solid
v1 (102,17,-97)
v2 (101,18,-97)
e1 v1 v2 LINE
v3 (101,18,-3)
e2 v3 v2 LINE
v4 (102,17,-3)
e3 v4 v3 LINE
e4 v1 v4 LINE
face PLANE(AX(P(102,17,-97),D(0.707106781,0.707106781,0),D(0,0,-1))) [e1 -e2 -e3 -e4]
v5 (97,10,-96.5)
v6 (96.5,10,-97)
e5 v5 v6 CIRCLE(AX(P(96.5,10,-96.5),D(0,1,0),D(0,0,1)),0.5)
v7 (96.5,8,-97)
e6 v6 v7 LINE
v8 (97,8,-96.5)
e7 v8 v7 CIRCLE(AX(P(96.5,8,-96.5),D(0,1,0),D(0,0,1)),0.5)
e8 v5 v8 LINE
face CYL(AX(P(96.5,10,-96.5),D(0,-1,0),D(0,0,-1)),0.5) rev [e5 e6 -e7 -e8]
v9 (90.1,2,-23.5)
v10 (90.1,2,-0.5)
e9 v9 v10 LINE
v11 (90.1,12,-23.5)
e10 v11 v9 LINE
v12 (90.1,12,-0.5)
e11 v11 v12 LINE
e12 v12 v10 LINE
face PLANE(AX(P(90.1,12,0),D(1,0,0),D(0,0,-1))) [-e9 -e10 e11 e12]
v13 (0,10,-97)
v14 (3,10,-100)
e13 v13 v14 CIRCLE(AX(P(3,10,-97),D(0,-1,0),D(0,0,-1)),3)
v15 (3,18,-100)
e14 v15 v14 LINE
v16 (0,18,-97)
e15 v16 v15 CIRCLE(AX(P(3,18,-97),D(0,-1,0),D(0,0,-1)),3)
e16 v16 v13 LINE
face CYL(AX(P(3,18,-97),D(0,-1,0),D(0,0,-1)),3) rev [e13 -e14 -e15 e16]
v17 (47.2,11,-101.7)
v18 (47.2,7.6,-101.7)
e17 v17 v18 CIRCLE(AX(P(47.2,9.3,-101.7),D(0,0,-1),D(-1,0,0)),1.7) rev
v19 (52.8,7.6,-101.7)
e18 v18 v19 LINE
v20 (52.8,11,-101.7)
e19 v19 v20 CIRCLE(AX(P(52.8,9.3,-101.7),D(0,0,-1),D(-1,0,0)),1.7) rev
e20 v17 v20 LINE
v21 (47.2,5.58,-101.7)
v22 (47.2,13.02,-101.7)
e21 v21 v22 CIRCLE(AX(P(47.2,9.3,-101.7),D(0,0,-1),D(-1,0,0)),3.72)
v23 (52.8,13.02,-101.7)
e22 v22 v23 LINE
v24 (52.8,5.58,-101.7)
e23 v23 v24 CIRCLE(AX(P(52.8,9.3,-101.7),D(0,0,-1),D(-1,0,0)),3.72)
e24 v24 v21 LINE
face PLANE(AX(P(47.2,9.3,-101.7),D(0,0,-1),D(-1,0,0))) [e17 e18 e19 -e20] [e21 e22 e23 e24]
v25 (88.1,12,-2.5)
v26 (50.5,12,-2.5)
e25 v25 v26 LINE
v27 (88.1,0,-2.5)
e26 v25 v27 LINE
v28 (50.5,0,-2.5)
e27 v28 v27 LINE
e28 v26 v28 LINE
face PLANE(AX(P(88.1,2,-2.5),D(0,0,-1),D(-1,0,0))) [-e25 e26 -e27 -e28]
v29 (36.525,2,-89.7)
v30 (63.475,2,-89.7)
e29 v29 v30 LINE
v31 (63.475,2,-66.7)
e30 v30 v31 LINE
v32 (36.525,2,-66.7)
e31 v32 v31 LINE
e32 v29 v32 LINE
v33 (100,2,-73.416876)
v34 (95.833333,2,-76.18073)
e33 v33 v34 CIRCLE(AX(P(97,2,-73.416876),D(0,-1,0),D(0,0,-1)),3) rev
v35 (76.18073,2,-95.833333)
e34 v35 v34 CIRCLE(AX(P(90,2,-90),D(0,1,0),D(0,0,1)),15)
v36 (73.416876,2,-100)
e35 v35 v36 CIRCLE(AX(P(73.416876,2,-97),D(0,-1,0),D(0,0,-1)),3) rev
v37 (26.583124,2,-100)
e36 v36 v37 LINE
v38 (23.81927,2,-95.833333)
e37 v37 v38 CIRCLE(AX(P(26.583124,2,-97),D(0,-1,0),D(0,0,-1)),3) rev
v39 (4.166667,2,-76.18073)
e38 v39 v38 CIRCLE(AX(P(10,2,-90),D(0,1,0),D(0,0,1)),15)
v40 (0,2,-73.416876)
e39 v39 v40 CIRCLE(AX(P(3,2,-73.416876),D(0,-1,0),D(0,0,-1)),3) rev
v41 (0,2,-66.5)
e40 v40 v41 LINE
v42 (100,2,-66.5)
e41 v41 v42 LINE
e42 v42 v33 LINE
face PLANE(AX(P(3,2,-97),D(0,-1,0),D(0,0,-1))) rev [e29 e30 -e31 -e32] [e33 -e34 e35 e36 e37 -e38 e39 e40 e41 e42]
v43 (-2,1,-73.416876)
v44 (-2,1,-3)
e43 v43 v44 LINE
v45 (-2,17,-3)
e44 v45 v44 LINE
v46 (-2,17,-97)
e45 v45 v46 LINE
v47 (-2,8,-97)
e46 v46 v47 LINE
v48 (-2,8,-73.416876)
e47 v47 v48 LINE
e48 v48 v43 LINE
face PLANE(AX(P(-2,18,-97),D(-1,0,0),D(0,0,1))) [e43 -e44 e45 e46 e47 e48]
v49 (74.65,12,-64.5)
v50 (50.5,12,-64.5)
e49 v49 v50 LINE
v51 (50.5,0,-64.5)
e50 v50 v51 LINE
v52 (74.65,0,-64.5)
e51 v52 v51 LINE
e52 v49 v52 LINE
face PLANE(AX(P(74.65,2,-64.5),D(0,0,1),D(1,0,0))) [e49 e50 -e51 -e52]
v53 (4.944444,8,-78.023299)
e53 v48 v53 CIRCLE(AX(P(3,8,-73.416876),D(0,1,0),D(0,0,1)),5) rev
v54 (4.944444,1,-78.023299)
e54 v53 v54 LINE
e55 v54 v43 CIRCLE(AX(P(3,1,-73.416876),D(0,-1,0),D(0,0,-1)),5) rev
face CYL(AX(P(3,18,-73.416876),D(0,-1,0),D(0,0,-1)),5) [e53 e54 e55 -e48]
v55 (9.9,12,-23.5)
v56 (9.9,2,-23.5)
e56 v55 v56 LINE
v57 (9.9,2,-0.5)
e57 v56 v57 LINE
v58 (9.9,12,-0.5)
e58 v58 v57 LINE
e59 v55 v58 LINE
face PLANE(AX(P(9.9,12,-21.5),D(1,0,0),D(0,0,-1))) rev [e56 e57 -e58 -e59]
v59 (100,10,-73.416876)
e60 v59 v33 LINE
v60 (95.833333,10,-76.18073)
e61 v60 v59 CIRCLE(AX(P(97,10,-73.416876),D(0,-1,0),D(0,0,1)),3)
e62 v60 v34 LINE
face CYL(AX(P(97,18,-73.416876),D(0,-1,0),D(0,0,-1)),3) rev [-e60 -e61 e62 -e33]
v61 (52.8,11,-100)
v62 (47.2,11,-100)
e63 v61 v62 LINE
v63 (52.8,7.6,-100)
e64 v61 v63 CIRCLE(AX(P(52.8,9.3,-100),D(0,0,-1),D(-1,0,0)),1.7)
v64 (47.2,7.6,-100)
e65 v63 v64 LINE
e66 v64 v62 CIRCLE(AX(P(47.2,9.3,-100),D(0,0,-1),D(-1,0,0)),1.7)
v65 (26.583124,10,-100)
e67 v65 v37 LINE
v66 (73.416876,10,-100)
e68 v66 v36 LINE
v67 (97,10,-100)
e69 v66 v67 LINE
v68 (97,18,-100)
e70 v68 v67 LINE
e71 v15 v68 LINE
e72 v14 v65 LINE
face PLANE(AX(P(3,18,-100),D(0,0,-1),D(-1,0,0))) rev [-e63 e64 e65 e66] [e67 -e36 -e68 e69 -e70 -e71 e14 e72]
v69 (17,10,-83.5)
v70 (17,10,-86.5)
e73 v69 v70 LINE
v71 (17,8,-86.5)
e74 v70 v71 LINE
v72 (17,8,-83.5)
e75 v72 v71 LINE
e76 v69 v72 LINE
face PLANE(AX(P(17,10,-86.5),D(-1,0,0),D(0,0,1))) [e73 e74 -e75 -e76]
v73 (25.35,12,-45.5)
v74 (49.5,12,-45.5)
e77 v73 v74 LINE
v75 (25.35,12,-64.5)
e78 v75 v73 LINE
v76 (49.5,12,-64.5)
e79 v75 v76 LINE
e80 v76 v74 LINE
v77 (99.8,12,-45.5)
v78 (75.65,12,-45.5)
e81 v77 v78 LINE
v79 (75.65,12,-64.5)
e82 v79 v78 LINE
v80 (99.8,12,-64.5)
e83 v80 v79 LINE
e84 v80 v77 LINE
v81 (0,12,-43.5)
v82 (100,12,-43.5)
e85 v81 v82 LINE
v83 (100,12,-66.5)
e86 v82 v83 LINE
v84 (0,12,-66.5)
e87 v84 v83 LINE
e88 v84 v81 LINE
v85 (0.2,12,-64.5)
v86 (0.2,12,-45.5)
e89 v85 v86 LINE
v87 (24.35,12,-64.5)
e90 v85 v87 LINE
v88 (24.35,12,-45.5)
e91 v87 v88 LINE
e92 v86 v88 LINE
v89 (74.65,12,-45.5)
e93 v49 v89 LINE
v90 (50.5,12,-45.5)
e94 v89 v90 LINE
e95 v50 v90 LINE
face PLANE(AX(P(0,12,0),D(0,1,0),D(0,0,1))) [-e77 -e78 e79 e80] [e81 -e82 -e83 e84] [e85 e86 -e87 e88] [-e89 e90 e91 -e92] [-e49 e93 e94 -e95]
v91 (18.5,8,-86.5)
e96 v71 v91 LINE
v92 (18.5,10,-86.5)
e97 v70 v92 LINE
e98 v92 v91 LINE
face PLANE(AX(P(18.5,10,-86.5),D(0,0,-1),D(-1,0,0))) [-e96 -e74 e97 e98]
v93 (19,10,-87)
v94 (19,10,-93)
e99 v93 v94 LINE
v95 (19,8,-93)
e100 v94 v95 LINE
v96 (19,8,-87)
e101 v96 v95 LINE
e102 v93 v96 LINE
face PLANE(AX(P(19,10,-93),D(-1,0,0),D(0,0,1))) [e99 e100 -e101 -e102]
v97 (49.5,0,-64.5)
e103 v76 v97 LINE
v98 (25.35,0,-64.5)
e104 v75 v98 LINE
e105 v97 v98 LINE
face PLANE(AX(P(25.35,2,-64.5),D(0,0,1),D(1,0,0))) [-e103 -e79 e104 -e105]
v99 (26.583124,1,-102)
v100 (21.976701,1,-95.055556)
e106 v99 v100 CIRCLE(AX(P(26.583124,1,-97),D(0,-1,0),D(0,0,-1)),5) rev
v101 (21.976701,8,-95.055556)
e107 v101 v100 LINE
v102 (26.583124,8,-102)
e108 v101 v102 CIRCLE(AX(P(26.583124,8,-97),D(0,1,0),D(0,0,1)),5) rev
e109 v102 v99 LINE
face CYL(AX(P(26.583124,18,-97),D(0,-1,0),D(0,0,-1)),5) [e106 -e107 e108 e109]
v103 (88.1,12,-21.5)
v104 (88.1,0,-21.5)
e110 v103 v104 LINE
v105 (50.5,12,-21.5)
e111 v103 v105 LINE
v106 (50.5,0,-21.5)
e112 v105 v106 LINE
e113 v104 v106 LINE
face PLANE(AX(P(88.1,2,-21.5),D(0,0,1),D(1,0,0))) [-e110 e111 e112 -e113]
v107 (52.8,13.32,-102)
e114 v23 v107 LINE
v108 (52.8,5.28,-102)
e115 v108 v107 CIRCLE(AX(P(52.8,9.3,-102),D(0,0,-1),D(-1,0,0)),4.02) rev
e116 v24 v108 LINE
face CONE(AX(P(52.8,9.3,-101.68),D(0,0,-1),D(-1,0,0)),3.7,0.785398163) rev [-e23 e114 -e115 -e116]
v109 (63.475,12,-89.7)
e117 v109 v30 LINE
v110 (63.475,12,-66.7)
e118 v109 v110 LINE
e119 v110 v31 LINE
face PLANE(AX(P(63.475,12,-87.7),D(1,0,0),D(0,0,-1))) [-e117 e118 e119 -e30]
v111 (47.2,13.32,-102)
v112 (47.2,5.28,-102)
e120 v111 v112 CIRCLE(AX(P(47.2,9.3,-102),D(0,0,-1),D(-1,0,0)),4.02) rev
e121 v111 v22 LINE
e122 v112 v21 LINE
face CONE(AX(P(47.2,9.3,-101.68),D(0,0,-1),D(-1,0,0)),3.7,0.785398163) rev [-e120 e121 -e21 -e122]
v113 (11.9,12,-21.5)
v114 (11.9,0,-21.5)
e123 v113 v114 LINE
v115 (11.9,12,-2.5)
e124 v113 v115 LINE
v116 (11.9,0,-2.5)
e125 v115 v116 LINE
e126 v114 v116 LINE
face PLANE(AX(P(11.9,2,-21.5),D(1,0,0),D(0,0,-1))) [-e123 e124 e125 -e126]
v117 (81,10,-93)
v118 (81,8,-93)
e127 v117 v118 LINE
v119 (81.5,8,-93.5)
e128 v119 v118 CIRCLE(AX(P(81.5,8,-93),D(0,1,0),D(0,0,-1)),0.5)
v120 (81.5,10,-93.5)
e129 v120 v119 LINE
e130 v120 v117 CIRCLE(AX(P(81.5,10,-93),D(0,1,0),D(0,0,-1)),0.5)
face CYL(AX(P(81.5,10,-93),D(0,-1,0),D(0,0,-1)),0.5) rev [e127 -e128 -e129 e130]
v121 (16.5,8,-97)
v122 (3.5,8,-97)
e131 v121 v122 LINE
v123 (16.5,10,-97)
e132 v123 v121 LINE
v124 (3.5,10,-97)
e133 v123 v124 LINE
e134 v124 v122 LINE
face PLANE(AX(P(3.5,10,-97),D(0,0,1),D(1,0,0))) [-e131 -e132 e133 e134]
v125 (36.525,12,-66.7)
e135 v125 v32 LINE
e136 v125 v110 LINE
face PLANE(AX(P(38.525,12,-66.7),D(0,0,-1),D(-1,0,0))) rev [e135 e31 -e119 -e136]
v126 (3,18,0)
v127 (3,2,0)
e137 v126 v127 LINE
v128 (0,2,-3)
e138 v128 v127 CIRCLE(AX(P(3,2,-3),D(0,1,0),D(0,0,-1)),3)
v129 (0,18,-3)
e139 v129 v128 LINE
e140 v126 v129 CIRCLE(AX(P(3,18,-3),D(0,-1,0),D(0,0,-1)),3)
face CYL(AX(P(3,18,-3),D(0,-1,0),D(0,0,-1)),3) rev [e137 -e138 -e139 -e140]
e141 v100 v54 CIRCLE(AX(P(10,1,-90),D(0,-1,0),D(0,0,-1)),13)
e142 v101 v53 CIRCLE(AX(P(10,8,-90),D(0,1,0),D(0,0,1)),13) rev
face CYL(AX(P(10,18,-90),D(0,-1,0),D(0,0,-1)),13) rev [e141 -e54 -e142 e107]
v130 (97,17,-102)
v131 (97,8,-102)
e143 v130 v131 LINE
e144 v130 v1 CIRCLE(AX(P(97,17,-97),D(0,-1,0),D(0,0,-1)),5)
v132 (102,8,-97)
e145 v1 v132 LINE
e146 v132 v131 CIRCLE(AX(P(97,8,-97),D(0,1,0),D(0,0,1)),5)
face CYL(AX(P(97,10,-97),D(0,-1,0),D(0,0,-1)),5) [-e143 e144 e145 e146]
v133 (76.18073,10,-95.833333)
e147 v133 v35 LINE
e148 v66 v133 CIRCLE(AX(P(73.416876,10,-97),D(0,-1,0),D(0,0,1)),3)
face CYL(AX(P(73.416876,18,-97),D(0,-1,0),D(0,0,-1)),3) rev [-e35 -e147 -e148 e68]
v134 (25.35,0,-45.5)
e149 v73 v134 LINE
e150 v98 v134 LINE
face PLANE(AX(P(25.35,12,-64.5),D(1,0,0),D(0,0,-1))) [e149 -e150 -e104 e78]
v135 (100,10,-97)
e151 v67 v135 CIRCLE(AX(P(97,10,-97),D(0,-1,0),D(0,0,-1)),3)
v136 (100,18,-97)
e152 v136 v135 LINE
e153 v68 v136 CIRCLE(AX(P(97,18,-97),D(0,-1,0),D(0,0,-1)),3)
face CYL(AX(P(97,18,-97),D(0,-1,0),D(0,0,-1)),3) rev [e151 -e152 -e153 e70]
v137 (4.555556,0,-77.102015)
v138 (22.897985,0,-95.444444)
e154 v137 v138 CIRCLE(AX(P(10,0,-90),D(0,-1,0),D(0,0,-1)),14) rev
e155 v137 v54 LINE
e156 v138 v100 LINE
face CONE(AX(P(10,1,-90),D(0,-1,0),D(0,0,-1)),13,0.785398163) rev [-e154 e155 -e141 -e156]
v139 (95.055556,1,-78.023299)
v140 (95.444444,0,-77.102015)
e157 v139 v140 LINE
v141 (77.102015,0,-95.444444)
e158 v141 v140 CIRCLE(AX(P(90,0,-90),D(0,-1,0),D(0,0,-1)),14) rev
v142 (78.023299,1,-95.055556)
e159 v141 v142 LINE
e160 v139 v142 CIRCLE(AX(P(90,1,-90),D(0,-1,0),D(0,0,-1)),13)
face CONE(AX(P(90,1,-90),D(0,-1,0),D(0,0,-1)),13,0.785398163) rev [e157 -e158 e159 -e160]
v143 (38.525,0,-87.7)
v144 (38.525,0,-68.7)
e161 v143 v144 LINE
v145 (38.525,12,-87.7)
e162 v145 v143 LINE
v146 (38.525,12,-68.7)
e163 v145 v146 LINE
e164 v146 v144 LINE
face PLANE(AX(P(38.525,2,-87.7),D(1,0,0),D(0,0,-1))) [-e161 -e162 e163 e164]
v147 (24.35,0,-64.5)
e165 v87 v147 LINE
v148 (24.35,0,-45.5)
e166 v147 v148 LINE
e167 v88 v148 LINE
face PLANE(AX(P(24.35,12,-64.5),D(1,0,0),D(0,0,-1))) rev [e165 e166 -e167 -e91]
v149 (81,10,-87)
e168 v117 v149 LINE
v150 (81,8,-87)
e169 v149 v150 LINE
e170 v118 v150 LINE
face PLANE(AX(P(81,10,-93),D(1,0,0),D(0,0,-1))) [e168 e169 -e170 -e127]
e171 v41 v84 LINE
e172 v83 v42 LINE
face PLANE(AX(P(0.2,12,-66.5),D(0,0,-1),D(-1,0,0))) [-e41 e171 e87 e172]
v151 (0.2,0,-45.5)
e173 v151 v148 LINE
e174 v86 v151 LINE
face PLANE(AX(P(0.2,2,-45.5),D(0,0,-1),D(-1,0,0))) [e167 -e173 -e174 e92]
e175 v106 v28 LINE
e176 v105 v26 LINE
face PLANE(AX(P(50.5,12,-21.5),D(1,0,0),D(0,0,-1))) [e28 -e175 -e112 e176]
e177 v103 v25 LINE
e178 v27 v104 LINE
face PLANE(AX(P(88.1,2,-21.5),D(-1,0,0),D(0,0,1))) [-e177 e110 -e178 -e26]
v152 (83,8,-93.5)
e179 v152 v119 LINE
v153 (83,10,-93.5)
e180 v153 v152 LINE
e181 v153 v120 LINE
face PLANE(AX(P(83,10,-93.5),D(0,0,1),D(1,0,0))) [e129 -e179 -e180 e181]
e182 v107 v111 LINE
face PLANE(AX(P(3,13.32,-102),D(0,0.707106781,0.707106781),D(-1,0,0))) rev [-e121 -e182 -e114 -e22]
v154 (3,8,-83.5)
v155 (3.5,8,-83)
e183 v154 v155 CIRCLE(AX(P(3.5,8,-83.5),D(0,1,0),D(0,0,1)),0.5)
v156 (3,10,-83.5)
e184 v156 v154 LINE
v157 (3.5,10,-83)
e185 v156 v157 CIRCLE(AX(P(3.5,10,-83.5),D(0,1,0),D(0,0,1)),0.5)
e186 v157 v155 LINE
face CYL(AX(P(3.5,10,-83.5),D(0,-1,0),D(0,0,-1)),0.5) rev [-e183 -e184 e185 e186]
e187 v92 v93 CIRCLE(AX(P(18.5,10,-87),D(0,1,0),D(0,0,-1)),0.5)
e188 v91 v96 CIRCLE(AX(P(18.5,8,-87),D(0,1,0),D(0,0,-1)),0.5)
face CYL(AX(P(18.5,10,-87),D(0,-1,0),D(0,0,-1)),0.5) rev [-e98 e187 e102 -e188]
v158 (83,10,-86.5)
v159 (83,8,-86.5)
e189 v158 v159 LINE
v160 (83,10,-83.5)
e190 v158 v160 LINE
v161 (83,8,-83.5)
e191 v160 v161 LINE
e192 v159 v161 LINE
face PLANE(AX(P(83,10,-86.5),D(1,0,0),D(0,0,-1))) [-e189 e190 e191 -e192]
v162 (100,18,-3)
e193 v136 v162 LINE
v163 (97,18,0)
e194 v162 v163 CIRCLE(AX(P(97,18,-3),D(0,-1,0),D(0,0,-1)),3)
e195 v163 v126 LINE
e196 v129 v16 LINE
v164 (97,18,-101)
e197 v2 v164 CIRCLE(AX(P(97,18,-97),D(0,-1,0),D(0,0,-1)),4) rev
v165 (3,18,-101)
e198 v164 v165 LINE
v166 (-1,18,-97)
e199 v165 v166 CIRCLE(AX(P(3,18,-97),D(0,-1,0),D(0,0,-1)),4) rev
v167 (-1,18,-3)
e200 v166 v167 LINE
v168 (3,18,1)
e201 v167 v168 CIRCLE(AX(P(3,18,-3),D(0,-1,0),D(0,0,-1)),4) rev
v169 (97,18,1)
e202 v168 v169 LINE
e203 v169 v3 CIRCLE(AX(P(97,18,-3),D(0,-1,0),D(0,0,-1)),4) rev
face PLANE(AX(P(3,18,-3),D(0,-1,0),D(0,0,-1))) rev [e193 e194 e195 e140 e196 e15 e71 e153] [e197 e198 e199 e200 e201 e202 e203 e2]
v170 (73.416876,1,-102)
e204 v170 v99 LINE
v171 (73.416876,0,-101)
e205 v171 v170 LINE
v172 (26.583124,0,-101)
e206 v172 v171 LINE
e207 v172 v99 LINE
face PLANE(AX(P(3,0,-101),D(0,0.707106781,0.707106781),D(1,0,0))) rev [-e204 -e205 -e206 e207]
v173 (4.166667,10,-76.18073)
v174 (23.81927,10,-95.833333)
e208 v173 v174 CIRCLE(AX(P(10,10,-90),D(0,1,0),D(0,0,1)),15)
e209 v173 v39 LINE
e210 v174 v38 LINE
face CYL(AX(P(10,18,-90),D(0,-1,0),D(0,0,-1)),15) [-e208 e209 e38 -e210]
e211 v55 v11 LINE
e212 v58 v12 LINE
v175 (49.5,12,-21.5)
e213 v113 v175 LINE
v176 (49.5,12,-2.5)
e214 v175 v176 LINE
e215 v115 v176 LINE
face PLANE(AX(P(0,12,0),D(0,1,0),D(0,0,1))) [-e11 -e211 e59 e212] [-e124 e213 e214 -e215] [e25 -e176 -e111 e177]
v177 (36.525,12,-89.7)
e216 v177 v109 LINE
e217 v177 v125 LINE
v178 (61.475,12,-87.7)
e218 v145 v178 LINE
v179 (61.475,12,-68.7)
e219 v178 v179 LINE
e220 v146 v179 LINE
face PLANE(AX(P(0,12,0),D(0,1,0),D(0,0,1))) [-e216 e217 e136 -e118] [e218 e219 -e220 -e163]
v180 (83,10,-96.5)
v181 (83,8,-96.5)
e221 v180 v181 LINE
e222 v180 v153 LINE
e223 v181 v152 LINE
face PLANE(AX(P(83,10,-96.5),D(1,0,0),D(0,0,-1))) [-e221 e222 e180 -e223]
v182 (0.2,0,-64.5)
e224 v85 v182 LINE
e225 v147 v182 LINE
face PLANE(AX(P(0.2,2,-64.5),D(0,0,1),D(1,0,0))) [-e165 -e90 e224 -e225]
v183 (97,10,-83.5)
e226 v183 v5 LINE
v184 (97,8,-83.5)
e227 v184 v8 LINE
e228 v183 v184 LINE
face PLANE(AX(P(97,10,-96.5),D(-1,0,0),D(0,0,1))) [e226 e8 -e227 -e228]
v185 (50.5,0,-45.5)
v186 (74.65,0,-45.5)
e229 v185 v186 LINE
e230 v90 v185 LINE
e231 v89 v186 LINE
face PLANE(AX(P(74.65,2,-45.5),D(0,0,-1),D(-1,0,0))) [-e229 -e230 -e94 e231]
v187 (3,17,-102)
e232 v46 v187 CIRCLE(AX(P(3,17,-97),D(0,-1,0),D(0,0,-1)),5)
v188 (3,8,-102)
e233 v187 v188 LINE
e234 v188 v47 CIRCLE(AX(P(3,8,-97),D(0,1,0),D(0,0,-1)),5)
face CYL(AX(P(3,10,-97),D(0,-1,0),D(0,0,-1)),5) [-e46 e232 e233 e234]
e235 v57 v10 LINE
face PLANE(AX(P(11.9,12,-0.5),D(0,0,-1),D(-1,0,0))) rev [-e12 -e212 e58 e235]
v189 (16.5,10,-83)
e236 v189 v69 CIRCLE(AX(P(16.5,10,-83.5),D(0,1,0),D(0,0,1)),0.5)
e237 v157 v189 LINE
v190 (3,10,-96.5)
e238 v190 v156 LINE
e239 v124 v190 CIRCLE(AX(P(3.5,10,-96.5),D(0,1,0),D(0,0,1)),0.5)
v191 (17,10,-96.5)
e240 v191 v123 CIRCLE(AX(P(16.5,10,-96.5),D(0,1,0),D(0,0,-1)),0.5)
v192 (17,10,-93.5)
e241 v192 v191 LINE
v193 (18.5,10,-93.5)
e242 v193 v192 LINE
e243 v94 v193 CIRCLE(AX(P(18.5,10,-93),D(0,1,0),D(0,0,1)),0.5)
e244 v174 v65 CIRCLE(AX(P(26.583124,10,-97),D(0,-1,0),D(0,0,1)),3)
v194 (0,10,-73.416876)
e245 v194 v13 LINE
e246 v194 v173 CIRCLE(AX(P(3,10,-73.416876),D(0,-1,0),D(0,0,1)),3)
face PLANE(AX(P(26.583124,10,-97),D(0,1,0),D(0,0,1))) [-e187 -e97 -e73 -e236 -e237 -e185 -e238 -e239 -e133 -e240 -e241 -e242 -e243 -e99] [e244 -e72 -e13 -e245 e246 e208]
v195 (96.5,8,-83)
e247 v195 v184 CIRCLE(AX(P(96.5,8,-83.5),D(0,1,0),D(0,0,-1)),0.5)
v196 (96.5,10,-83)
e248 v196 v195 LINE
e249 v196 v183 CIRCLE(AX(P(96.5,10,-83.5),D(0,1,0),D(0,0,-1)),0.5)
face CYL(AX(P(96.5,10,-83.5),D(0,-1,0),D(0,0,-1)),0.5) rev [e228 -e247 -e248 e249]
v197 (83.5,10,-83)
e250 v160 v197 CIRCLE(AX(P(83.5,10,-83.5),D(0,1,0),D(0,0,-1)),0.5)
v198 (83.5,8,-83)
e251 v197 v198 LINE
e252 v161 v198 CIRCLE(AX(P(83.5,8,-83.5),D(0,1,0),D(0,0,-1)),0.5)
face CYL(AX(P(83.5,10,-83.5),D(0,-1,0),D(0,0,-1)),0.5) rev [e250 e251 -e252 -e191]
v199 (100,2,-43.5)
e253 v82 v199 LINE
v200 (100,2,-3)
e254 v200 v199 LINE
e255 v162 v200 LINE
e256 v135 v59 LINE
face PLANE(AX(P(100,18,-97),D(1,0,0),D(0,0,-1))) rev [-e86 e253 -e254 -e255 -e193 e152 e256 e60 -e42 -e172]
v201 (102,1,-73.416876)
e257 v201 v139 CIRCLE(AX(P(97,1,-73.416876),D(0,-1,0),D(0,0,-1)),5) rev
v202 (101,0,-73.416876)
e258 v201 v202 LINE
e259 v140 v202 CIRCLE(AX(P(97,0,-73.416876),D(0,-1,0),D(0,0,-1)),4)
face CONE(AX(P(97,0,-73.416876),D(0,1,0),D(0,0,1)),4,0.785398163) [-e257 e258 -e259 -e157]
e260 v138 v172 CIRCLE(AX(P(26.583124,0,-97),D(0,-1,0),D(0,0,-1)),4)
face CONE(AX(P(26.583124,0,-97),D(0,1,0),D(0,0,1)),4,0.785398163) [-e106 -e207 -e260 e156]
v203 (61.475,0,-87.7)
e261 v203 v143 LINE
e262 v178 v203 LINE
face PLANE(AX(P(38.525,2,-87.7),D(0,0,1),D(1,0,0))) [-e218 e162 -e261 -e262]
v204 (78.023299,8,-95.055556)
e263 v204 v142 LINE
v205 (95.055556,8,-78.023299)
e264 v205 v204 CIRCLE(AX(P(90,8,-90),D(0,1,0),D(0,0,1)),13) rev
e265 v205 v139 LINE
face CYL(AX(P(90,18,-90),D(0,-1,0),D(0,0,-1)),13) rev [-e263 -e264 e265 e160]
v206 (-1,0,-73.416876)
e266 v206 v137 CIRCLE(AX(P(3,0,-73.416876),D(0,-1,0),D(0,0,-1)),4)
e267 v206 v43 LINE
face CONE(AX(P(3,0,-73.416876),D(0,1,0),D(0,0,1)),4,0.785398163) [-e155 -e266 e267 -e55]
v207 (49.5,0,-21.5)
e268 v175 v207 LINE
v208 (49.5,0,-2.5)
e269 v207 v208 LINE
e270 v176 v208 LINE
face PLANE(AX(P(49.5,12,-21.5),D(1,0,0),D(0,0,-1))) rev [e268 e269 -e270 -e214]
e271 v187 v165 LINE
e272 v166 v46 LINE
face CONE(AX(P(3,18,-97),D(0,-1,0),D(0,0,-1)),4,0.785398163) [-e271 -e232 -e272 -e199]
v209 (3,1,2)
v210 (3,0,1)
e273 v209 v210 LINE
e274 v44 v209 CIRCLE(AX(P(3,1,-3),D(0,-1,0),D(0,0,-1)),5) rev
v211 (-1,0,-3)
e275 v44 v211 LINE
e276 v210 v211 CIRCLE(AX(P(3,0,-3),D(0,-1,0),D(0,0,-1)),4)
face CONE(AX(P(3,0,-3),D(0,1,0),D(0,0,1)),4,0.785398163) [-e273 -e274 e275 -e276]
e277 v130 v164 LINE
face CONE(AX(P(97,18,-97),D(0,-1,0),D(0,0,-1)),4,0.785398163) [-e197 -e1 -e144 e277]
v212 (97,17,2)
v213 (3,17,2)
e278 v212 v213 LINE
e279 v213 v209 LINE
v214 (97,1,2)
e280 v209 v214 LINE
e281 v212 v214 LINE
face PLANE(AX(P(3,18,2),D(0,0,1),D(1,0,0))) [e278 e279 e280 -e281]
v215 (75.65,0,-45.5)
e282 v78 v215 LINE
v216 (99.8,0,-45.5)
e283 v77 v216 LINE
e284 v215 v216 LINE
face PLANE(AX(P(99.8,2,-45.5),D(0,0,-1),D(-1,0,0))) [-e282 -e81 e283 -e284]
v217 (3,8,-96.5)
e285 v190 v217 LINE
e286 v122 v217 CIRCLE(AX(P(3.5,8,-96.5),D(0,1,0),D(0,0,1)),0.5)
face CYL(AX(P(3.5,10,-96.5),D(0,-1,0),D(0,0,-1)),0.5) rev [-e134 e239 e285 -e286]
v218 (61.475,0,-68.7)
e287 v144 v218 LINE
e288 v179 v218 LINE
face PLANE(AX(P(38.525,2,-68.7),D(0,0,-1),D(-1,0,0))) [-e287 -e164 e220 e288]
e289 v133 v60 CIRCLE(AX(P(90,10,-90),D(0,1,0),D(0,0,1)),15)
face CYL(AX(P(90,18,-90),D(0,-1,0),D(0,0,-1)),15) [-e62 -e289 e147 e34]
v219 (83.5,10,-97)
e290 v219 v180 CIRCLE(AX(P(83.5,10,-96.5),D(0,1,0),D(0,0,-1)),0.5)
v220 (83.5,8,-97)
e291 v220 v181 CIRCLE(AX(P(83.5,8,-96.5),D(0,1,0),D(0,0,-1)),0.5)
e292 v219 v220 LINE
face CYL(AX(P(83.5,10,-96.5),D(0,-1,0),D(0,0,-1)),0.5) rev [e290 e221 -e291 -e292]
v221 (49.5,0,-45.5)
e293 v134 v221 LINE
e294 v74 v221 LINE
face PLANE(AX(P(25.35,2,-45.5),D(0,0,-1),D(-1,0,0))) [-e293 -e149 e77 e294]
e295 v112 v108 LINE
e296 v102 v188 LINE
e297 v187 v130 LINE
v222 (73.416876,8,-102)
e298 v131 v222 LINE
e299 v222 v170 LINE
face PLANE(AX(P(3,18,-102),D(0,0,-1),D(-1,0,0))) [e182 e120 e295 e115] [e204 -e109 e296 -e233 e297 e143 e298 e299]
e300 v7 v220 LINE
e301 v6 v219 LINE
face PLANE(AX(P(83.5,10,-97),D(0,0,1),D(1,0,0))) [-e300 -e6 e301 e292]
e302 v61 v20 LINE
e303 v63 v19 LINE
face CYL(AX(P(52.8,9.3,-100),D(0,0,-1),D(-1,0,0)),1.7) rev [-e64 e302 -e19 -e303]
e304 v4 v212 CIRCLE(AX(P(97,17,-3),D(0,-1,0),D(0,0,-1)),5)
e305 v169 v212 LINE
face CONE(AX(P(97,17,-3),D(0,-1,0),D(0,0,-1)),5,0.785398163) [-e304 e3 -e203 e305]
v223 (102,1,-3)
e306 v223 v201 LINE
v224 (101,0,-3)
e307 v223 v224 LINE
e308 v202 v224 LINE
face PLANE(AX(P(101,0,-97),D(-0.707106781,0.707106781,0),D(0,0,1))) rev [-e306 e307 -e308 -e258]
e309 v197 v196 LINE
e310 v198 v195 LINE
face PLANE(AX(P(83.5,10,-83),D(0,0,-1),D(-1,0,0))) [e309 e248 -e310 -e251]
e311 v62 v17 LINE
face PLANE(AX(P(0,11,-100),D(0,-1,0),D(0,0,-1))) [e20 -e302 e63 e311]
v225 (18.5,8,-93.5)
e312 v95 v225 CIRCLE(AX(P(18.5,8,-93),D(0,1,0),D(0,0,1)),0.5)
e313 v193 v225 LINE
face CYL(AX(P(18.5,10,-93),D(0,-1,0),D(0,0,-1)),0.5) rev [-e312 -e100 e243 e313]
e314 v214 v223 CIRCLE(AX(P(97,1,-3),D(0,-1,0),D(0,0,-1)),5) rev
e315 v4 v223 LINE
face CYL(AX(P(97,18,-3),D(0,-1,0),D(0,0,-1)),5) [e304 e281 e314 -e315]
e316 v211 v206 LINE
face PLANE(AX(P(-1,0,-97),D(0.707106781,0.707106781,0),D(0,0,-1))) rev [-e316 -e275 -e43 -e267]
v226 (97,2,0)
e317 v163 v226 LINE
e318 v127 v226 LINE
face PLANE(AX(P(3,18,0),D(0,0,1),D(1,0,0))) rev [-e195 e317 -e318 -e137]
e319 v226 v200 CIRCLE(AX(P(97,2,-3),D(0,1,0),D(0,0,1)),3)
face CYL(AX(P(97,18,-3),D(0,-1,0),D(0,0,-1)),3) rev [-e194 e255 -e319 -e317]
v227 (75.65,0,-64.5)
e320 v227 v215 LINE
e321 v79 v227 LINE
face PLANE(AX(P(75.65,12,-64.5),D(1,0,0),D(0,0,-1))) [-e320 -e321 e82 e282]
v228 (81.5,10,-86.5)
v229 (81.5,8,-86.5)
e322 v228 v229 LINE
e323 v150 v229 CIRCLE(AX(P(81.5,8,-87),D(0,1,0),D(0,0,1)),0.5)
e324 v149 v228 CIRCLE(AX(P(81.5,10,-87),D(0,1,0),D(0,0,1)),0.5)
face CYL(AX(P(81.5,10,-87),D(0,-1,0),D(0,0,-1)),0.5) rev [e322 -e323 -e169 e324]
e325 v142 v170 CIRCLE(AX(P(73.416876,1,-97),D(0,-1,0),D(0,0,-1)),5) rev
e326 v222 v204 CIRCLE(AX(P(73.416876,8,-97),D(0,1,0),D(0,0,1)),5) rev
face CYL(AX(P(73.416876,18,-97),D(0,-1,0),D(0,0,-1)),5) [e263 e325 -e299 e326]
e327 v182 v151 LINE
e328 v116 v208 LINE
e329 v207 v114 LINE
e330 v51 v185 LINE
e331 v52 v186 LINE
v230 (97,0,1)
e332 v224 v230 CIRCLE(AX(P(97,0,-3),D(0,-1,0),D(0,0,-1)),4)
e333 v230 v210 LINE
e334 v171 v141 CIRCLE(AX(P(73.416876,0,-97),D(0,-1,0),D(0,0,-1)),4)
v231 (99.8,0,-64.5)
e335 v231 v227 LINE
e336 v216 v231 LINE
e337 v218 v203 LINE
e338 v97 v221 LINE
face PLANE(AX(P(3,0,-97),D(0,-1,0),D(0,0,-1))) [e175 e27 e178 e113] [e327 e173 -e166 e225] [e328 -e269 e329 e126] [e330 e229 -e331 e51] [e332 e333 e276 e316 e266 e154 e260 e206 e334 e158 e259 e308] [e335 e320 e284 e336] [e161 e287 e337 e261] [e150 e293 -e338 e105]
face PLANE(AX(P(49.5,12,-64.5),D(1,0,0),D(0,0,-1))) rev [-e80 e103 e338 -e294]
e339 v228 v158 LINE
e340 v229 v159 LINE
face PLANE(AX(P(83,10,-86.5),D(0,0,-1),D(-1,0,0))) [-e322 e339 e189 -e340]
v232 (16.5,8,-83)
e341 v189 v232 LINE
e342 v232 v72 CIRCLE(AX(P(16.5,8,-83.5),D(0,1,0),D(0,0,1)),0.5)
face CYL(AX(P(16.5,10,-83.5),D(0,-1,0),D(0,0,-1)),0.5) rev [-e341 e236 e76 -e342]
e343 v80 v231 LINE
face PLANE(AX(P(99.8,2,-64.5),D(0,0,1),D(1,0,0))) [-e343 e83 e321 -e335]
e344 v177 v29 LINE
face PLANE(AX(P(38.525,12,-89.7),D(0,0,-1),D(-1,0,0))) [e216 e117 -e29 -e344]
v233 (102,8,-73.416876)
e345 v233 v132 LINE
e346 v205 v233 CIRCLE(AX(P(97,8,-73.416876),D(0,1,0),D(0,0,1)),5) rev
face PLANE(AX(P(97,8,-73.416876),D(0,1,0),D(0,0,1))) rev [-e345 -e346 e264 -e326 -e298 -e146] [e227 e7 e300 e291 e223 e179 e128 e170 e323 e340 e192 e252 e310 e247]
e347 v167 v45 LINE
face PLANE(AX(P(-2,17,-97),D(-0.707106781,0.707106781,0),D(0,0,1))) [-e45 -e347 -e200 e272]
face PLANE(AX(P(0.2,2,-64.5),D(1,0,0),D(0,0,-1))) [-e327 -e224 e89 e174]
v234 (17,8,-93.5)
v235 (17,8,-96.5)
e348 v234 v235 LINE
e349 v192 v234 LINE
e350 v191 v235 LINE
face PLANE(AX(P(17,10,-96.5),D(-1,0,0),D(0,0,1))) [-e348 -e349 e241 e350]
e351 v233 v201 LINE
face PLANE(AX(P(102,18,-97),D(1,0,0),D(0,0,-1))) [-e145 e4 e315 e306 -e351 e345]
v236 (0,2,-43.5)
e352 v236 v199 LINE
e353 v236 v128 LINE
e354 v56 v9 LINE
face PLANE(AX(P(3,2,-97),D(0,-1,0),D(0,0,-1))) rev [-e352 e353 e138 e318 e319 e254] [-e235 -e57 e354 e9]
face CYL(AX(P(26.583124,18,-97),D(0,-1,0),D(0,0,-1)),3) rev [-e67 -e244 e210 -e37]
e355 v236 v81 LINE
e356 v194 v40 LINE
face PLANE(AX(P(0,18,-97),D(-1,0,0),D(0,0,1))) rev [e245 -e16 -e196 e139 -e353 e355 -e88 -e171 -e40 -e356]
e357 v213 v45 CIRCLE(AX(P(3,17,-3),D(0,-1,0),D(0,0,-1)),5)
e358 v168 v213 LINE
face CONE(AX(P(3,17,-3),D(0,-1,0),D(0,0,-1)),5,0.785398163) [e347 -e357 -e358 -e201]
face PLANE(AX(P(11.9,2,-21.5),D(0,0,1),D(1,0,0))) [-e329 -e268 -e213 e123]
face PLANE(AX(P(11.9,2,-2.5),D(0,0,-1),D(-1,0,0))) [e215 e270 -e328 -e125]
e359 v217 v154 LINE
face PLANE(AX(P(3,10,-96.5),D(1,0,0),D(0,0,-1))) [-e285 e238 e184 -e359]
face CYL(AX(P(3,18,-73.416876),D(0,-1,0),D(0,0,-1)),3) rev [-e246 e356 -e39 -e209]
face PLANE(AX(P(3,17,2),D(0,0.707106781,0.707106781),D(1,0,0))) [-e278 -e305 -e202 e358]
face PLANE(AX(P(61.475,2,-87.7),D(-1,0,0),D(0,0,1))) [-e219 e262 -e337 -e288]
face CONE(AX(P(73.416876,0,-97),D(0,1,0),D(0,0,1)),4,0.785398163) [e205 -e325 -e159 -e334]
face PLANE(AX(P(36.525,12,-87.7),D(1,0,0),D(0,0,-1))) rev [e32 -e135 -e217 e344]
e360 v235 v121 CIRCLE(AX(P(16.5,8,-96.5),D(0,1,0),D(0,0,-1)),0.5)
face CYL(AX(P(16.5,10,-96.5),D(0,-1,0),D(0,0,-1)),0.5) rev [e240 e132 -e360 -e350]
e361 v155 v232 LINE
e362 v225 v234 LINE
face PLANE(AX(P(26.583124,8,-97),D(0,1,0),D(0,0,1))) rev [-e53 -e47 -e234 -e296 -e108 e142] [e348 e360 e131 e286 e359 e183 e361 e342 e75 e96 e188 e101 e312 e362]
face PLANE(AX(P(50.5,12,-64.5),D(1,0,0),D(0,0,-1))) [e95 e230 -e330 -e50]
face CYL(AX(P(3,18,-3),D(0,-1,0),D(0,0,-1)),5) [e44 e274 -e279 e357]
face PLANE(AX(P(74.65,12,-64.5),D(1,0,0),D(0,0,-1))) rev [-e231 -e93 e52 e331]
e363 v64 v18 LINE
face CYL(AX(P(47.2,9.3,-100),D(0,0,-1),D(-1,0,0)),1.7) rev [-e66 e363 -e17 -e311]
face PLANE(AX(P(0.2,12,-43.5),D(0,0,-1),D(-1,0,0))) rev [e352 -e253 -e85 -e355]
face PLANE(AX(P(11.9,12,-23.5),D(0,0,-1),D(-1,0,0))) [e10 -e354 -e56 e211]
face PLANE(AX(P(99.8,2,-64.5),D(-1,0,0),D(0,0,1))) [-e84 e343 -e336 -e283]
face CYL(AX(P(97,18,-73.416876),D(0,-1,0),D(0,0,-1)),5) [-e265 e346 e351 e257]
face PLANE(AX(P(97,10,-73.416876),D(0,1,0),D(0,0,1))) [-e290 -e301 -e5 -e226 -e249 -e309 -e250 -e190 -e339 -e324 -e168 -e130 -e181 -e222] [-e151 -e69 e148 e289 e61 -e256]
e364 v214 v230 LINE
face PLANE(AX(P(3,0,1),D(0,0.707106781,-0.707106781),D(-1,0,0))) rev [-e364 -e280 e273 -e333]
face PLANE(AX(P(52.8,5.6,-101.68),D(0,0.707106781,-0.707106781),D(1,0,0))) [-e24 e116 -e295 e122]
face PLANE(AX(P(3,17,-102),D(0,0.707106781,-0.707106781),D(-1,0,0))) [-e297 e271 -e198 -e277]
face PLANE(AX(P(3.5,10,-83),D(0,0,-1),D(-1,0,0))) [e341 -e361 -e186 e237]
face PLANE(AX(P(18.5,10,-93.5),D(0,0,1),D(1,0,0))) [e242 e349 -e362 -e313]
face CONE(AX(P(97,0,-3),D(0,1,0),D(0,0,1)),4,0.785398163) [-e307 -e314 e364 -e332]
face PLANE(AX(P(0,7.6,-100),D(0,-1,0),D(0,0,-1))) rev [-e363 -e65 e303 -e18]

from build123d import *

# Parameters (mm, degrees)
SKETCH_1_W            = 22.95
SKETCH_1_H            = 19
SKETCH_1_W_2          = 37.6
SKETCH_1_W_3          = 24.15
EXTRUDE_7_DEPTH       = 2
SKETCH_4_R            = 15
CUT_EXTRUDE_1_DEPTH   = 18
FILLET_1_R            = 3
FILLET_2_R            = 3
SKETCH_1_6_W          = 26.95
SKETCH_1_6_H          = 23
SKETCH_1_6_W_2        = 22.95
SKETCH_1_6_H_2        = 19
EXTRUDE_3_DEPTH       = 12
EXTRUDE_4_OUTLINE_W   = 103.6
EXTRUDE_4_OUTLINE_H   = 23
EXTRUDE_4_OUTLINE_W_2 = 23.15
EXTRUDE_4_OUTLINE_H_2 = 19
EXTRUDE_4_OUTLINE_W_3 = 22.15
EXTRUDE_4_DEPTH       = 12
EXTRUDE_5_OUTLINE_W   = 80.2
EXTRUDE_5_OUTLINE_H   = 23
EXTRUDE_5_OUTLINE_W_2 = 36.6
EXTRUDE_5_OUTLINE_H_2 = 19
EXTRUDE_5_DEPTH       = 12
EXTRUDE_START         = -2
EXTRUDE_7_2_DEPTH     = 18
SKETCH_11_W           = 28.583123952
SKETCH_11_H           = 28.583123952
CUT_EXTRUDE_8_DEPTH   = 10
EXTRUDE_8_DEPTH       = 2
EXTRUDE_9_DEPTH       = 2
EXTRUDE_12_DEPTH      = 8
CHAMFER_1_SIZE        = 1
CHAMFER_2_SIZE        = 1
CUT_EXTRUDE_9_DEPTH   = 2
CUT_EXTRUDE_10_DEPTH  = 0.3
CHAMFER_3_SIZE        = 0.32
SKETCH_1_11_W         = 37.6
SKETCH_1_11_H         = 19
SKETCH_1_11_W_2       = 24.15
CUT_EXTRUDE_12_DEPTH  = 12


# Read off the part's stored shape, not the designer's step: 拉伸-薄壁4, 拉伸-薄壁5
with BuildPart() as part:
    # 草图1 → Extrude 7 (new body)
    with BuildSketch(Plane(origin=(0, 0, 0), x_dir=(1, 0, 0), z_dir=(0, 1, 0))):
        with BuildLine():
            Line((3, 0), (97, 0))
            ThreePointArc((97, 0), (99.121320344, 0.878679656), (100, 3))
            Line((100, 3), (100, 97))
            ThreePointArc((100, 97), (99.121320344, 99.121320344), (97, 100))
            Line((97, 100), (3, 100))
            ThreePointArc((3, 100), (0.878679656, 99.121320344), (0, 97))
            Line((0, 97), (0, 3))
            ThreePointArc((0, 3), (0.878679656, 0.878679656), (3, 0))
        make_face()
        with Locations((50, 78.2)):
            Rectangle(SKETCH_1_W, SKETCH_1_H, mode=Mode.SUBTRACT)
        with Locations((30.7, 12)):
            Rectangle(SKETCH_1_W_2, SKETCH_1_H, mode=Mode.SUBTRACT)
        with Locations((87.725, 55)):
            Rectangle(SKETCH_1_W_3, SKETCH_1_H, mode=Mode.SUBTRACT)
        with Locations((37.425, 55)):
            Rectangle(SKETCH_1_W_3, SKETCH_1_H, mode=Mode.SUBTRACT)
        with Locations((62.575, 55)):
            Rectangle(SKETCH_1_W_3, SKETCH_1_H, mode=Mode.SUBTRACT)
        with Locations((12.275, 55)):
            Rectangle(SKETCH_1_W_3, SKETCH_1_H, mode=Mode.SUBTRACT)
        with Locations((69.3, 12)):
            Rectangle(SKETCH_1_W_2, SKETCH_1_H, mode=Mode.SUBTRACT)
    extrude(amount=EXTRUDE_7_DEPTH)

    # 草图4 → 切除-拉伸1 (cut)
    with BuildSketch(Plane(origin=(0, 2, 0), x_dir=(1, 0, 0), z_dir=(0, 1, 0))):
        with Locations((10, 90)):
            Circle(SKETCH_4_R)
        with Locations((90, 90)):
            Circle(SKETCH_4_R)
    extrude(amount=-CUT_EXTRUDE_1_DEPTH, mode=Mode.SUBTRACT)

    # 圆角1
    fillet_1_edges = [part.edges().sort_by_distance(p)[0] for p in [
        (21.180339887, 1, -100),
        (0, 1, -78.819660113),
    ]]
    fillet(fillet_1_edges, radius=FILLET_1_R)

    # 圆角2
    fillet_2_edges = [part.edges().sort_by_distance(p)[0] for p in [
        (78.819660113, 1, -100),
        (100, 1, -78.819660113),
    ]]
    fillet(fillet_2_edges, radius=FILLET_2_R)

    # 草图1<6> → 拉伸-薄壁3 (add)
    with BuildSketch(Plane(origin=(0, 0, 0), x_dir=(1, 0, 0), z_dir=(0, 1, 0))):
        with Locations((50, 78.2)):
            Rectangle(SKETCH_1_6_W, SKETCH_1_6_H)
        with Locations((50, 78.2)):
            Rectangle(SKETCH_1_6_W_2, SKETCH_1_6_H_2, mode=Mode.SUBTRACT)
    extrude(amount=EXTRUDE_3_DEPTH)

    # 拉伸-薄壁4 outline → 拉伸-薄壁4 (add)
    with BuildSketch(Plane(origin=(0, 0, 0), x_dir=(1, 0, 0), z_dir=(0, 1, 0))):
        with Locations((50, 55)):
            Rectangle(EXTRUDE_4_OUTLINE_W, EXTRUDE_4_OUTLINE_H)
        with Locations((11.775, 55)):
            Rectangle(EXTRUDE_4_OUTLINE_W_2, EXTRUDE_4_OUTLINE_H_2, mode=Mode.SUBTRACT)
        with Locations((37.425, 55)):
            Rectangle(EXTRUDE_4_OUTLINE_W_3, EXTRUDE_4_OUTLINE_H_2, mode=Mode.SUBTRACT)
        with Locations((62.575, 55)):
            Rectangle(EXTRUDE_4_OUTLINE_W_3, EXTRUDE_4_OUTLINE_H_2, mode=Mode.SUBTRACT)
        with Locations((88.225, 55)):
            Rectangle(EXTRUDE_4_OUTLINE_W_2, EXTRUDE_4_OUTLINE_H_2, mode=Mode.SUBTRACT)
    extrude(amount=EXTRUDE_4_DEPTH)

    # 拉伸-薄壁5 outline → 拉伸-薄壁5 (add)
    with BuildSketch(Plane(origin=(0, 0, 0), x_dir=(1, 0, 0), z_dir=(0, 1, 0))):
        with Locations((50, 12)):
            Rectangle(EXTRUDE_5_OUTLINE_W, EXTRUDE_5_OUTLINE_H)
        with Locations((30.2, 12)):
            Rectangle(EXTRUDE_5_OUTLINE_W_2, EXTRUDE_5_OUTLINE_H_2, mode=Mode.SUBTRACT)
        with Locations((69.8, 12)):
            Rectangle(EXTRUDE_5_OUTLINE_W_2, EXTRUDE_5_OUTLINE_H_2, mode=Mode.SUBTRACT)
    extrude(amount=EXTRUDE_5_DEPTH)

    # 草图10 → Extrude 7 2 (add)
    with BuildSketch(Plane(origin=(0, 2, 0), x_dir=(1, 0, 0), z_dir=(0, 1, 0)).offset(EXTRUDE_START)):
        with BuildLine():
            Line((-2, 3), (-2, 73.416876048))
            ThreePointArc((-2, 73.416876048), (0.236146008, 77.583542715), (4.944444444, 78.023299368))
            ThreePointArc((4.944444444, 78.023299368), (19.192388155, 80.807611845), (21.976700632, 95.055555556))
            ThreePointArc((21.976700632, 95.055555556), (22.416457285, 99.763853992), (26.583123952, 102))
            Line((26.583123952, 102), (73.416876048, 102))
            ThreePointArc((73.416876048, 102), (77.583542715, 99.763853992), (78.023299368, 95.055555556))
            ThreePointArc((78.023299368, 95.055555556), (80.807611845, 80.807611845), (95.055555556, 78.023299368))
            ThreePointArc((95.055555556, 78.023299368), (99.763853992, 77.583542715), (102, 73.416876048))
            Line((102, 73.416876048), (102, 3))
            ThreePointArc((102, 3), (100.535533906, -0.535533906), (97, -2))
            Line((97, -2), (3, -2))
            ThreePointArc((3, -2), (-0.535533906, -0.535533906), (-2, 3))
        make_face()
        with BuildLine():
            Line((0, 3), (0, 73.416876048))
            ThreePointArc((0, 73.416876048), (1.341687605, 75.916876048), (4.166666667, 76.18073004))
            ThreePointArc((4.166666667, 76.18073004), (20.606601718, 79.393398282), (23.81926996, 95.833333333))
            ThreePointArc((23.81926996, 95.833333333), (24.083123952, 98.658312395), (26.583123952, 100))
            Line((26.583123952, 100), (73.416876048, 100))
            ThreePointArc((73.416876048, 100), (75.916876048, 98.658312395), (76.18073004, 95.833333333))
            ThreePointArc((76.18073004, 95.833333333), (79.393398282, 79.393398282), (95.833333333, 76.18073004))
            ThreePointArc((95.833333333, 76.18073004), (98.658312395, 75.916876048), (100, 73.416876048))
            Line((100, 73.416876048), (100, 3))
            ThreePointArc((100, 3), (99.121320344, 0.878679656), (97, 0))
            Line((97, 0), (3, 0))
            ThreePointArc((3, 0), (0.878679656, 0.878679656), (0, 3))
        make_face(mode=Mode.SUBTRACT)
    extrude(amount=EXTRUDE_7_2_DEPTH)

    # 草图11 → 切除-拉伸8 (cut)
    with BuildSketch(Plane(origin=(0, 18, 0), x_dir=(1, 0, 0), z_dir=(0, 1, 0))):
        with Locations((87.708438024, 87.708438024)):
            Rectangle(SKETCH_11_W, SKETCH_11_H)
        with Locations((12.291561976, 87.708438024)):
            Rectangle(SKETCH_11_W, SKETCH_11_H)
    extrude(amount=-CUT_EXTRUDE_8_DEPTH, mode=Mode.SUBTRACT)

    # 草图13 → 凸台-拉伸8 (add)
    with BuildSketch(Plane(origin=(0, 8, 0), x_dir=(1, 0, 0), z_dir=(0, 1, 0))):
        with BuildLine():
            Line((26.583123952, 102), (26.583123952, 100))
            ThreePointArc((26.583123952, 100), (24.083123952, 98.658312395), (23.81926996, 95.833333333))
            ThreePointArc((23.81926996, 95.833333333), (20.606601718, 79.393398282), (4.166666667, 76.18073004))
            ThreePointArc((4.166666667, 76.18073004), (1.341687605, 75.916876048), (0, 73.416876048))
            Line((0, 73.416876048), (-2, 73.416876048))
            Line((-2, 73.416876048), (-2, 97))
            ThreePointArc((-2, 97), (-0.535533906, 100.535533906), (3, 102))
            Line((3, 102), (26.583123952, 102))
        make_face()
        with BuildLine():
            Line((18.5, 93.5), (17, 93.5))
            Line((17, 93.5), (17, 96.5))
            ThreePointArc((17, 96.5), (16.853553391, 96.853553391), (16.5, 97))
            Line((16.5, 97), (3.5, 97))
            ThreePointArc((3.5, 97), (3.146446609, 96.853553391), (3, 96.5))
            Line((3, 96.5), (3, 83.5))
            ThreePointArc((3, 83.5), (3.146446609, 83.146446609), (3.5, 83))
            Line((3.5, 83), (16.5, 83))
            ThreePointArc((16.5, 83), (16.853553391, 83.146446609), (17, 83.5))
            Line((17, 83.5), (17, 86.5))
            Line((17, 86.5), (18.5, 86.5))
            ThreePointArc((18.5, 86.5), (18.853553391, 86.646446609), (19, 87))
            Line((19, 87), (19, 93))
            ThreePointArc((19, 93), (18.853553391, 93.353553391), (18.5, 93.5))
        make_face(mode=Mode.SUBTRACT)
    extrude(amount=EXTRUDE_8_DEPTH)

    # 草图15 → 凸台-拉伸9 (add)
    with BuildSketch(Plane(origin=(0, 8, 0), x_dir=(1, 0, 0), z_dir=(0, 1, 0))):
        with BuildLine():
            Line((73.416876048, 102), (97, 102))
            ThreePointArc((97, 102), (100.535533906, 100.535533906), (102, 97))
            Line((102, 97), (102, 73.416876048))
            Line((102, 73.416876048), (100, 73.416876048))
            ThreePointArc((100, 73.416876048), (98.658312395, 75.916876048), (95.833333333, 76.18073004))
            ThreePointArc((95.833333333, 76.18073004), (79.393398282, 79.393398282), (76.18073004, 95.833333333))
            ThreePointArc((76.18073004, 95.833333333), (75.916876048, 98.658312395), (73.416876048, 100))
            Line((73.416876048, 100), (73.416876048, 102))
        make_face()
        with BuildLine():
            Line((83, 86.5), (83, 83.5))
            ThreePointArc((83, 83.5), (83.146446609, 83.146446609), (83.5, 83))
            Line((83.5, 83), (96.5, 83))
            ThreePointArc((96.5, 83), (96.853553391, 83.146446609), (97, 83.5))
            Line((97, 83.5), (97, 96.5))
            ThreePointArc((97, 96.5), (96.853553391, 96.853553391), (96.5, 97))
            Line((96.5, 97), (83.5, 97))
            ThreePointArc((83.5, 97), (83.146446609, 96.853553391), (83, 96.5))
            Line((83, 96.5), (83, 93.5))
            Line((83, 93.5), (81.5, 93.5))
            ThreePointArc((81.5, 93.5), (81.146446609, 93.353553391), (81, 93))
            Line((81, 93), (81, 87))
            ThreePointArc((81, 87), (81.146446609, 86.646446609), (81.5, 86.5))
            Line((81.5, 86.5), (83, 86.5))
        make_face(mode=Mode.SUBTRACT)
    extrude(amount=EXTRUDE_9_DEPTH)

    # 草图18 → 凸台-拉伸12 (add)
    with BuildSketch(Plane(origin=(0, 10, 0), x_dir=(1, 0, 0), z_dir=(0, 1, 0))):
        with BuildLine():
            Line((0, 73.416876048), (-2, 73.416876048))
            Line((-2, 73.416876048), (-2, 97))
            ThreePointArc((-2, 97), (-0.535533906, 100.535533906), (3, 102))
            Line((3, 102), (26.583123952, 102))
            Line((26.583123952, 102), (26.583123952, 100))
            Line((26.583123952, 100), (3, 100))
            ThreePointArc((3, 100), (0.878679656, 99.121320344), (0, 97))
            Line((0, 97), (0, 73.416876048))
        make_face()
        with BuildLine():
            Line((73.416876048, 102), (73.416876048, 100))
            Line((73.416876048, 100), (97, 100))
            ThreePointArc((97, 100), (99.121320344, 99.121320344), (100, 97))
            Line((100, 97), (100, 73.416876048))
            Line((100, 73.416876048), (102, 73.416876048))
            Line((102, 73.416876048), (102, 97))
            ThreePointArc((102, 97), (100.535533906, 100.535533906), (97, 102))
            Line((97, 102), (73.416876048, 102))
        make_face()
    extrude(amount=EXTRUDE_12_DEPTH)

    # 倒角1
    chamfer_1_edges = [part.edges().sort_by_distance(p)[0] for p in [
        (80.807611845, 0, -80.807611845),
        (19.192388155, 0, -80.807611845),
        (50, 0, 2),
        (-0.535533906, 0, 0.535533906),
        (-2, 0, -38.208438024),
        (0.236146008, 0, -77.583542715),
        (22.416457285, 0, -99.763853992),
        (50, 0, -102),
        (77.583542715, 0, -99.763853992),
        (99.763853992, 0, -77.583542715),
        (102, 0, -38.208438024),
        (100.535533906, 0, 0.535533906),
    ]]
    chamfer(chamfer_1_edges, length=CHAMFER_1_SIZE)

    # 倒角2
    chamfer_2_edges = [part.edges().sort_by_distance(p)[0] for p in [
        (50, 18, 2),
        (100.535533906, 18, 0.535533906),
        (102, 18, -50),
        (50, 18, -102),
        (-2, 18, -50),
        (-0.535533906, 18, 0.535533906),
        (100.535533906, 18, -100.535533906),
        (-0.535533906, 18, -100.535533906),
    ]]
    chamfer(chamfer_2_edges, length=CHAMFER_2_SIZE)

    # 草图20 → 切除-拉伸9 (cut)
    with BuildSketch(Plane(origin=(0, 0, -102), x_dir=(-1, 0, 0), z_dir=(0, 0, -1))):
        with BuildLine():
            Line((-52.8, 7.6), (-47.2, 7.6))
            ThreePointArc((-47.2, 7.6), (-45.5, 9.3), (-47.2, 11))
            Line((-47.2, 11), (-52.8, 11))
            ThreePointArc((-52.8, 11), (-54.5, 9.3), (-52.8, 7.6))
        make_face()
    extrude(amount=-CUT_EXTRUDE_9_DEPTH, mode=Mode.SUBTRACT)

    # 草图20<3> → 切除-拉伸10 (cut)
    with BuildSketch(Plane(origin=(0, 0, -102), x_dir=(-1, 0, 0), z_dir=(0, 0, -1))):
        with BuildLine():
            Line((-52.8, 13), (-47.2, 13))
            ThreePointArc((-47.2, 13), (-43.5, 9.3), (-47.2, 5.6))
            Line((-47.2, 5.6), (-52.8, 5.6))
            ThreePointArc((-52.8, 5.6), (-56.5, 9.3), (-52.8, 13))
        make_face()
    extrude(amount=-CUT_EXTRUDE_10_DEPTH, mode=Mode.SUBTRACT)

    # 倒角3
    # the kernel refuses this chamfer: 0.32 mm, written as the material it adds along each edge
    # the kernel refuses this chamfer: 0.32 mm, written as the material it takes off along each edge
    with BuildSketch(Plane(origin=(47.2, 5.6, -102), x_dir=(0, -0.9996219169112974, -0.027495876610561392), z_dir=(1, 0, 0))) as chamfer_3_2_piece_1_section:
        Polygon((CHAMFER_3_SIZE * 0.999621916911, -CHAMFER_3_SIZE * 0.0274958766106), (-CHAMFER_3_SIZE * 0.0274958766106, -CHAMFER_3_SIZE * 0.999621916911), (0, 0), align=None)
    chamfer_3_2_piece_1 = extrude(amount=5.6, mode=Mode.PRIVATE)
    chamfer_3_2_piece_1 = split(chamfer_3_2_piece_1, bisect_by=Plane(origin=(50, 5.492941176, -101.7), z_dir=(0, 0, -1)), keep=Keep.TOP, mode=Mode.PRIVATE)
    add(chamfer_3_2_piece_1, mode=Mode.SUBTRACT)
    with BuildSketch(Plane(origin=(47.2, 9.3, -102), x_dir=(0, 1, 0), z_dir=(1, 0, 0))) as chamfer_3_2_piece_2_section:
        Polygon((3.7 + CHAMFER_3_SIZE, 0), (3.7, CHAMFER_3_SIZE), (3.7, 0), align=None)
    chamfer_3_2_piece_2 = revolve(axis=Axis((47.2, 9.3, -102), (0, 0, 1)), revolution_arc=180, mode=Mode.PRIVATE)
    chamfer_3_2_piece_2 = split(chamfer_3_2_piece_2, bisect_by=Plane(origin=(46.708459178, 13.091931565, -101.7), z_dir=(0, 0, -1)), keep=Keep.TOP, mode=Mode.PRIVATE)
    add(chamfer_3_2_piece_2, mode=Mode.SUBTRACT)
    with BuildSketch(Plane(origin=(52.8, 13, -102), x_dir=(0, 0.9996219169112974, -0.027495876610561392), z_dir=(-1, 0, 0))) as chamfer_3_2_piece_3_section:
        Polygon((CHAMFER_3_SIZE * 0.999621916911, -CHAMFER_3_SIZE * 0.0274958766106), (-CHAMFER_3_SIZE * 0.0274958766106, -CHAMFER_3_SIZE * 0.999621916911), (0, 0), align=None)
    chamfer_3_2_piece_3 = extrude(amount=5.6, mode=Mode.PRIVATE)
    chamfer_3_2_piece_3 = split(chamfer_3_2_piece_3, bisect_by=Plane(origin=(50, 13.107058824, -101.7), z_dir=(0, 0, -1)), keep=Keep.TOP, mode=Mode.PRIVATE)
    add(chamfer_3_2_piece_3, mode=Mode.SUBTRACT)
    with BuildSketch(Plane(origin=(52.8, 9.3, -102), x_dir=(0, -1, 0), z_dir=(-1, 0, 0))) as chamfer_3_2_piece_4_section:
        Polygon((3.7 + CHAMFER_3_SIZE, 0), (3.7, CHAMFER_3_SIZE), (3.7, 0), align=None)
    chamfer_3_2_piece_4 = revolve(axis=Axis((52.8, 9.3, -102), (0, 0, 1)), revolution_arc=180, mode=Mode.PRIVATE)
    chamfer_3_2_piece_4 = split(chamfer_3_2_piece_4, bisect_by=Plane(origin=(53.291540822, 5.508068435, -101.7), z_dir=(0, 0, -1)), keep=Keep.TOP, mode=Mode.PRIVATE)
    add(chamfer_3_2_piece_4, mode=Mode.SUBTRACT)

    # 草图1<11> → 切除-拉伸12 (cut)
    with BuildSketch(Plane(origin=(0, 0, 0), x_dir=(1, 0, 0), z_dir=(0, 1, 0))):
        with Locations((30.7, 12)):
            Rectangle(SKETCH_1_11_W, SKETCH_1_11_H)
        with Locations((87.725, 55)):
            Rectangle(SKETCH_1_11_W_2, SKETCH_1_11_H)
        with Locations((37.425, 55)):
            Rectangle(SKETCH_1_11_W_2, SKETCH_1_11_H)
        with Locations((62.575, 55)):
            Rectangle(SKETCH_1_11_W_2, SKETCH_1_11_H)
        with Locations((12.275, 55)):
            Rectangle(SKETCH_1_11_W_2, SKETCH_1_11_H)
        with Locations((69.3, 12)):
            Rectangle(SKETCH_1_11_W, SKETCH_1_11_H)
    extrude(amount=CUT_EXTRUDE_12_DEPTH, mode=Mode.SUBTRACT)


solid = part.part
